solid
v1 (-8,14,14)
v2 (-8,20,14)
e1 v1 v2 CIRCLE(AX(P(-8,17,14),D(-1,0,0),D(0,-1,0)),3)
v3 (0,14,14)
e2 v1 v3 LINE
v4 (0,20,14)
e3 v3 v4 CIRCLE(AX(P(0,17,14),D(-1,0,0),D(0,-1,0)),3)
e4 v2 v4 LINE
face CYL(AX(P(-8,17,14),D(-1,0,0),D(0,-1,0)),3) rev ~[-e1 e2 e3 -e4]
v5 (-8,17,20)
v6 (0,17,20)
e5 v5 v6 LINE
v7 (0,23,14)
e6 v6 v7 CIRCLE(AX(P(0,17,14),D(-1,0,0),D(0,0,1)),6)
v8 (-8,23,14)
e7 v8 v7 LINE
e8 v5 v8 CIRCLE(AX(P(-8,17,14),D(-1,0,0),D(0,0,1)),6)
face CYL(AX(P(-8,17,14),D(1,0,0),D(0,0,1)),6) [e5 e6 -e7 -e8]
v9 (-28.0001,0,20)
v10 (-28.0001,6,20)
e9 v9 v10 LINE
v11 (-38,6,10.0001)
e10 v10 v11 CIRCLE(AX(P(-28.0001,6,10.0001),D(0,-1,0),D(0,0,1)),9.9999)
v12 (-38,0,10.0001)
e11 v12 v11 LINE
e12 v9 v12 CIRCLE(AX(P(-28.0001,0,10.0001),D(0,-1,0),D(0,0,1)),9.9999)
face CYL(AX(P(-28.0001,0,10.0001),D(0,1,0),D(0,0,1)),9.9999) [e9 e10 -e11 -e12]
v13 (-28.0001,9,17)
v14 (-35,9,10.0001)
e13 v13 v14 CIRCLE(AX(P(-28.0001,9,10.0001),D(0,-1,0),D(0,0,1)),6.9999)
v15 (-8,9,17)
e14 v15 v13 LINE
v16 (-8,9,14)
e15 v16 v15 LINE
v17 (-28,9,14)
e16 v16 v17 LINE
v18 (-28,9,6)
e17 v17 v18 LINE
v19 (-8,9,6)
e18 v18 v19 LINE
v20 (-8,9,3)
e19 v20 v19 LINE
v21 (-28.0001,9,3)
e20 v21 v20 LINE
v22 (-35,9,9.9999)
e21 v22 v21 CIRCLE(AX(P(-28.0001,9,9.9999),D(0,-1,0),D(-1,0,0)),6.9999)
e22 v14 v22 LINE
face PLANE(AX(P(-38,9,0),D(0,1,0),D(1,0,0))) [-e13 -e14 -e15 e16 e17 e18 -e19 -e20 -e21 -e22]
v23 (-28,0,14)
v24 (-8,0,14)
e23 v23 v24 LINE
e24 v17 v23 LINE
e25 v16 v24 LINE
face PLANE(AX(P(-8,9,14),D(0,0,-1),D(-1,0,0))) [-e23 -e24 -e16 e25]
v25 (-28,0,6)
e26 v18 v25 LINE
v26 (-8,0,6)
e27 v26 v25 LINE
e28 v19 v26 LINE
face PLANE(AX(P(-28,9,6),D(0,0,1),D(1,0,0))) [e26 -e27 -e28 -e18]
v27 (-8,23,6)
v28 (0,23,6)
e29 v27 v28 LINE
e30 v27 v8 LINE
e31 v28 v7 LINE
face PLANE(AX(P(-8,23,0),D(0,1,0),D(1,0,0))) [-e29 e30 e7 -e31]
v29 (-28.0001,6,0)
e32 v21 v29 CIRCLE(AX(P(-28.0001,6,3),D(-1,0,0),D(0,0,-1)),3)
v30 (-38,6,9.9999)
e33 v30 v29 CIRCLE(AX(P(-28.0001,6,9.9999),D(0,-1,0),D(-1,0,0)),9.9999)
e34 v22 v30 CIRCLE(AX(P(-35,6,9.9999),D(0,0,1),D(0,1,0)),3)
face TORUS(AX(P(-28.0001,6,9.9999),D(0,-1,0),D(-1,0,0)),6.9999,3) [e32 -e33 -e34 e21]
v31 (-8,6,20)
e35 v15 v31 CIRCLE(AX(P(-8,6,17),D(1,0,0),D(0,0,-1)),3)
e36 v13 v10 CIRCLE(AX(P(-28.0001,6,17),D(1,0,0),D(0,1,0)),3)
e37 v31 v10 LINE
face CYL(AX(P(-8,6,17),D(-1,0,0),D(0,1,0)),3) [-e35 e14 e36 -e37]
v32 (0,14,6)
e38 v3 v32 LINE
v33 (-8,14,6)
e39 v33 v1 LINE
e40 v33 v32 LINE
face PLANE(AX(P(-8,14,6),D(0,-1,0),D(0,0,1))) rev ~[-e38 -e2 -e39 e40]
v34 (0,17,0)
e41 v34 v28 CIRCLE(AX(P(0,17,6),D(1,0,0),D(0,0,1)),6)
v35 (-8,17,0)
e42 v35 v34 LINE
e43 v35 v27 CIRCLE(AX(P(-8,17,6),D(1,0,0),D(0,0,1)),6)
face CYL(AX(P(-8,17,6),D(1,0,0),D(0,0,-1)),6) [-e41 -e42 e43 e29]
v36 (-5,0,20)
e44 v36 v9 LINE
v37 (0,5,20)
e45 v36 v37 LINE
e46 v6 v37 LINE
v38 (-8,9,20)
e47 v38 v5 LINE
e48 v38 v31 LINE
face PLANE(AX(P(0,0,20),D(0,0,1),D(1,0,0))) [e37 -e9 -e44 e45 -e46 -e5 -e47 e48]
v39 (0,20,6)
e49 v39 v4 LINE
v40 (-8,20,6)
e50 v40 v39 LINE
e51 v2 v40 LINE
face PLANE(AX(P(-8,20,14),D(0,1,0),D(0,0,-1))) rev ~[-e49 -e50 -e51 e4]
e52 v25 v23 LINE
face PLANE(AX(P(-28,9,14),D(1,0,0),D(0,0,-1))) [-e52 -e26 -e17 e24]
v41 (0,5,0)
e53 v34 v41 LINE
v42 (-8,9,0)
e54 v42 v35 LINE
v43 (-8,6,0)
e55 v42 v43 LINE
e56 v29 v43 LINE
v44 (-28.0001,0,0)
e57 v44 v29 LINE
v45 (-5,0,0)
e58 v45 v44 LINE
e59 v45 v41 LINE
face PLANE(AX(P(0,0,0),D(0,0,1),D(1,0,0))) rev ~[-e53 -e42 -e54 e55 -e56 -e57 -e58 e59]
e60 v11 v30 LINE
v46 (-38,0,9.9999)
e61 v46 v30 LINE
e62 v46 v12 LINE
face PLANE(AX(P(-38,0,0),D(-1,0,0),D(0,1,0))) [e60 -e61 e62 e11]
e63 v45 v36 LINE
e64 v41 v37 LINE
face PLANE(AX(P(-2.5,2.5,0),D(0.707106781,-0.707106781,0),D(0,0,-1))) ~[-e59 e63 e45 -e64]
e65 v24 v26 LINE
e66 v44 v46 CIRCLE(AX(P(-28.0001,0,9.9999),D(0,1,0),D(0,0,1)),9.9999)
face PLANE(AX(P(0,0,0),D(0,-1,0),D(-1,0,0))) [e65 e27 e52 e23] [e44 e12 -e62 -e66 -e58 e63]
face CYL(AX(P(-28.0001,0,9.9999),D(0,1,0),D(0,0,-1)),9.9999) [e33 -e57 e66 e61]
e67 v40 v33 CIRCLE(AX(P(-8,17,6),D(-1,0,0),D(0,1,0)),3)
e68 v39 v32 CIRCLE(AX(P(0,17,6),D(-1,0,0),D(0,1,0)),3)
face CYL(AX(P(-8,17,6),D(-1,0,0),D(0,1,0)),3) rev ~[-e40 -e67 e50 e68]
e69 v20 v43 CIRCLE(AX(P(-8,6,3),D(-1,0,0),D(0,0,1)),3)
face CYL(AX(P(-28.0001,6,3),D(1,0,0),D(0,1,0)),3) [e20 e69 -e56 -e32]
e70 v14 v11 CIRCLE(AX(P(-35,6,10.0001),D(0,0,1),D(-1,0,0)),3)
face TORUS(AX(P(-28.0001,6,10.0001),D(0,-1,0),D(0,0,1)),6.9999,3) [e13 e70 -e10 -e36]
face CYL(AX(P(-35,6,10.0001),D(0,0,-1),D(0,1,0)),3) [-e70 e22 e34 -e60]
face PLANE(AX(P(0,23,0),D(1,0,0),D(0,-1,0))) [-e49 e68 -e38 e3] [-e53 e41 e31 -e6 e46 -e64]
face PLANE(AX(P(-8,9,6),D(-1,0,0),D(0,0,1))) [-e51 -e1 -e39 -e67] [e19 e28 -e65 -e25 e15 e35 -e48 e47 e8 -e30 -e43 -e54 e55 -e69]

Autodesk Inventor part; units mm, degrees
ref_plane "YZ Plane" through (0, 0, 0) normal (1, 0, 0) x (0, 1, 0)
ref_plane "XZ Plane" through (0, 0, 0) normal (0, 1, 0) x (-1, 0, 0)
ref_plane "XY Plane" through (0, 0, 0) normal (0, 0, 1) x (1, 0, 0)
sketch "스케치1" plane through (0, 0, 0) normal (0, 0, 1) x (1, 0, 0)
  point P0 (0, 0)
sketch "스케치2" plane through (0, 0, 0) normal (0, 0, 1) x (1, 0, 0)
  point P0 (0, 0)
sketch "스케치3" plane through (0, 0, 0) normal (0, 0, 1) x (1, 0, 0)
  point P0 (0, 0)
sketch "스케치4" plane through (0, 0, 0) normal (0, 0, 1) x (1, 0, 0)
  line L0 (0, 0) -> (-38, 0)
  line L1 (-38, 0) -> (-38, 9)
  line L2 (-38, 9) -> (-8, 9)
  line L3 (-8, 9) -> (-8, 23)
  line L4 (-8, 23) -> (0, 23)
  line L5 (0, 23) -> (0, 0)
  dimension "d2" = 38
  dimension "d3" = 9
  dimension "d6" = 8
  dimension "d7" = 23
sketch "스케치5" plane through (0, 0, 0) normal (0, 0, 1) x (1, 0, 0)
  point P0 (0, 0)
extrude "돌출1" add sketch "스케치4" along normal blind 20
sketch "스케치6" plane through (-38, 9, 0) normal (0, 1, 0) x (1, 0, 0)
  point P0 (38, 0)
sketch "스케치7" plane through (-38, 9, 0) normal (0, 1, 0) x (1, 0, 0)
  line L0 (30, 0) -> (30, -20) projected
  line L1 (30, -14) -> (10, -14)
  line L2 (10, -14) -> (10, -6)
  line L3 (10, -6) -> (30, -6)
  line L4 (30, -6) -> (30, -14)
  line L5 (30, -20) -> (0, -20) projected
  line L6 (30, -6) -> (30, -14)
  line L7 (30, -6) -> (30, -14)
  line L8 (30, -14) -> (30, -6)
  line L9 (30, -14) -> (30, -6)
  point P0 (38, 0)
  dimension "d10" = 20
  dimension "d11" = 8
  dimension "d12" = 6
extrude "돌출2" cut sketch "스케치7" against normal blind 10
fillet "모깎기1" radius 10 2 edges at (-38, 4.5, 20) (-38, 4.5, 0)
fillet "모깎기2" radius 6 2 edges at (-4, 23, 20) (-4, 23, 0)
sketch "스케치8" plane through (-8, 0, 6) normal (-1, 0, 0) x (0, 0, 1)
  point P0 (-6, 0)
sketch "스케치9" plane through (-8, 0, 6) normal (-1, 0, 0) x (0, 0, 1)
  point P0 (-6, 0)
sketch "스케치10" plane through (-8, 0, 6) normal (-1, 0, 0) x (0, 0, 1)
  line L0 (0, 9) -> (0, 0) projected
  line L1 (8, 9) -> (8, 0) projected
  line L2 (0, 9) -> (8, 9)
  line L3 (-6, 9) -> (14, 9) projected
  line L4 (8, 9) -> (14, 9)
  line L5 (0, 9) -> (0, 0) projected
  point P0 (-6, 0)
sketch "스케치11" plane through (-8, 0, 6) normal (-1, 0, 0) x (0, 0, 1)
  line L0 (8, 9) -> (0, 9) projected
  line L1 (-6, 9) -> (0, 9) projected
  line L2 (0, 9) -> (-6, 9)
  point P0 (-6, 0)
sketch "스케치12" plane through (-8, 0, 6) normal (-1, 0, 0) x (0, 0, 1)
  line L0 (0, 17) -> (8, 17) construction
  line L1 (0, 14) -> (8, 14)
  line L2 (8, 20) -> (0, 20)
  arc A0 (0, 20) -> (0, 14) centre (0, 17) ccw
  arc A1 (8, 14) -> (8, 20) centre (8, 17) ccw
  line L3 (-6, 17) -> (-6, 9) projected
  line L4 (14, 0) -> (-6, 0) projected
  point P0 (4, 17)
  dimension "d18" = 8
  dimension "d19" = 6
  dimension "d20" = 10
  dimension "d21" = 17
sketch "스케치13" plane through (-8, 0, 6) normal (-1, 0, 0) x (0, 0, 1)
  point P0 (-6, 0)
extrude "돌출3" cut sketch "스케치12" against normal blind 10
fillet "모깎기3" radius 3 3 edges at (-35.0711, 9, 17.0711) (-18.0001, 9, 20) (-18.0001, 9, 0)
chamfer "모따기1" distance 5 angle 45 1 edges at (0, 0, 10)
properties part number "01_01"
